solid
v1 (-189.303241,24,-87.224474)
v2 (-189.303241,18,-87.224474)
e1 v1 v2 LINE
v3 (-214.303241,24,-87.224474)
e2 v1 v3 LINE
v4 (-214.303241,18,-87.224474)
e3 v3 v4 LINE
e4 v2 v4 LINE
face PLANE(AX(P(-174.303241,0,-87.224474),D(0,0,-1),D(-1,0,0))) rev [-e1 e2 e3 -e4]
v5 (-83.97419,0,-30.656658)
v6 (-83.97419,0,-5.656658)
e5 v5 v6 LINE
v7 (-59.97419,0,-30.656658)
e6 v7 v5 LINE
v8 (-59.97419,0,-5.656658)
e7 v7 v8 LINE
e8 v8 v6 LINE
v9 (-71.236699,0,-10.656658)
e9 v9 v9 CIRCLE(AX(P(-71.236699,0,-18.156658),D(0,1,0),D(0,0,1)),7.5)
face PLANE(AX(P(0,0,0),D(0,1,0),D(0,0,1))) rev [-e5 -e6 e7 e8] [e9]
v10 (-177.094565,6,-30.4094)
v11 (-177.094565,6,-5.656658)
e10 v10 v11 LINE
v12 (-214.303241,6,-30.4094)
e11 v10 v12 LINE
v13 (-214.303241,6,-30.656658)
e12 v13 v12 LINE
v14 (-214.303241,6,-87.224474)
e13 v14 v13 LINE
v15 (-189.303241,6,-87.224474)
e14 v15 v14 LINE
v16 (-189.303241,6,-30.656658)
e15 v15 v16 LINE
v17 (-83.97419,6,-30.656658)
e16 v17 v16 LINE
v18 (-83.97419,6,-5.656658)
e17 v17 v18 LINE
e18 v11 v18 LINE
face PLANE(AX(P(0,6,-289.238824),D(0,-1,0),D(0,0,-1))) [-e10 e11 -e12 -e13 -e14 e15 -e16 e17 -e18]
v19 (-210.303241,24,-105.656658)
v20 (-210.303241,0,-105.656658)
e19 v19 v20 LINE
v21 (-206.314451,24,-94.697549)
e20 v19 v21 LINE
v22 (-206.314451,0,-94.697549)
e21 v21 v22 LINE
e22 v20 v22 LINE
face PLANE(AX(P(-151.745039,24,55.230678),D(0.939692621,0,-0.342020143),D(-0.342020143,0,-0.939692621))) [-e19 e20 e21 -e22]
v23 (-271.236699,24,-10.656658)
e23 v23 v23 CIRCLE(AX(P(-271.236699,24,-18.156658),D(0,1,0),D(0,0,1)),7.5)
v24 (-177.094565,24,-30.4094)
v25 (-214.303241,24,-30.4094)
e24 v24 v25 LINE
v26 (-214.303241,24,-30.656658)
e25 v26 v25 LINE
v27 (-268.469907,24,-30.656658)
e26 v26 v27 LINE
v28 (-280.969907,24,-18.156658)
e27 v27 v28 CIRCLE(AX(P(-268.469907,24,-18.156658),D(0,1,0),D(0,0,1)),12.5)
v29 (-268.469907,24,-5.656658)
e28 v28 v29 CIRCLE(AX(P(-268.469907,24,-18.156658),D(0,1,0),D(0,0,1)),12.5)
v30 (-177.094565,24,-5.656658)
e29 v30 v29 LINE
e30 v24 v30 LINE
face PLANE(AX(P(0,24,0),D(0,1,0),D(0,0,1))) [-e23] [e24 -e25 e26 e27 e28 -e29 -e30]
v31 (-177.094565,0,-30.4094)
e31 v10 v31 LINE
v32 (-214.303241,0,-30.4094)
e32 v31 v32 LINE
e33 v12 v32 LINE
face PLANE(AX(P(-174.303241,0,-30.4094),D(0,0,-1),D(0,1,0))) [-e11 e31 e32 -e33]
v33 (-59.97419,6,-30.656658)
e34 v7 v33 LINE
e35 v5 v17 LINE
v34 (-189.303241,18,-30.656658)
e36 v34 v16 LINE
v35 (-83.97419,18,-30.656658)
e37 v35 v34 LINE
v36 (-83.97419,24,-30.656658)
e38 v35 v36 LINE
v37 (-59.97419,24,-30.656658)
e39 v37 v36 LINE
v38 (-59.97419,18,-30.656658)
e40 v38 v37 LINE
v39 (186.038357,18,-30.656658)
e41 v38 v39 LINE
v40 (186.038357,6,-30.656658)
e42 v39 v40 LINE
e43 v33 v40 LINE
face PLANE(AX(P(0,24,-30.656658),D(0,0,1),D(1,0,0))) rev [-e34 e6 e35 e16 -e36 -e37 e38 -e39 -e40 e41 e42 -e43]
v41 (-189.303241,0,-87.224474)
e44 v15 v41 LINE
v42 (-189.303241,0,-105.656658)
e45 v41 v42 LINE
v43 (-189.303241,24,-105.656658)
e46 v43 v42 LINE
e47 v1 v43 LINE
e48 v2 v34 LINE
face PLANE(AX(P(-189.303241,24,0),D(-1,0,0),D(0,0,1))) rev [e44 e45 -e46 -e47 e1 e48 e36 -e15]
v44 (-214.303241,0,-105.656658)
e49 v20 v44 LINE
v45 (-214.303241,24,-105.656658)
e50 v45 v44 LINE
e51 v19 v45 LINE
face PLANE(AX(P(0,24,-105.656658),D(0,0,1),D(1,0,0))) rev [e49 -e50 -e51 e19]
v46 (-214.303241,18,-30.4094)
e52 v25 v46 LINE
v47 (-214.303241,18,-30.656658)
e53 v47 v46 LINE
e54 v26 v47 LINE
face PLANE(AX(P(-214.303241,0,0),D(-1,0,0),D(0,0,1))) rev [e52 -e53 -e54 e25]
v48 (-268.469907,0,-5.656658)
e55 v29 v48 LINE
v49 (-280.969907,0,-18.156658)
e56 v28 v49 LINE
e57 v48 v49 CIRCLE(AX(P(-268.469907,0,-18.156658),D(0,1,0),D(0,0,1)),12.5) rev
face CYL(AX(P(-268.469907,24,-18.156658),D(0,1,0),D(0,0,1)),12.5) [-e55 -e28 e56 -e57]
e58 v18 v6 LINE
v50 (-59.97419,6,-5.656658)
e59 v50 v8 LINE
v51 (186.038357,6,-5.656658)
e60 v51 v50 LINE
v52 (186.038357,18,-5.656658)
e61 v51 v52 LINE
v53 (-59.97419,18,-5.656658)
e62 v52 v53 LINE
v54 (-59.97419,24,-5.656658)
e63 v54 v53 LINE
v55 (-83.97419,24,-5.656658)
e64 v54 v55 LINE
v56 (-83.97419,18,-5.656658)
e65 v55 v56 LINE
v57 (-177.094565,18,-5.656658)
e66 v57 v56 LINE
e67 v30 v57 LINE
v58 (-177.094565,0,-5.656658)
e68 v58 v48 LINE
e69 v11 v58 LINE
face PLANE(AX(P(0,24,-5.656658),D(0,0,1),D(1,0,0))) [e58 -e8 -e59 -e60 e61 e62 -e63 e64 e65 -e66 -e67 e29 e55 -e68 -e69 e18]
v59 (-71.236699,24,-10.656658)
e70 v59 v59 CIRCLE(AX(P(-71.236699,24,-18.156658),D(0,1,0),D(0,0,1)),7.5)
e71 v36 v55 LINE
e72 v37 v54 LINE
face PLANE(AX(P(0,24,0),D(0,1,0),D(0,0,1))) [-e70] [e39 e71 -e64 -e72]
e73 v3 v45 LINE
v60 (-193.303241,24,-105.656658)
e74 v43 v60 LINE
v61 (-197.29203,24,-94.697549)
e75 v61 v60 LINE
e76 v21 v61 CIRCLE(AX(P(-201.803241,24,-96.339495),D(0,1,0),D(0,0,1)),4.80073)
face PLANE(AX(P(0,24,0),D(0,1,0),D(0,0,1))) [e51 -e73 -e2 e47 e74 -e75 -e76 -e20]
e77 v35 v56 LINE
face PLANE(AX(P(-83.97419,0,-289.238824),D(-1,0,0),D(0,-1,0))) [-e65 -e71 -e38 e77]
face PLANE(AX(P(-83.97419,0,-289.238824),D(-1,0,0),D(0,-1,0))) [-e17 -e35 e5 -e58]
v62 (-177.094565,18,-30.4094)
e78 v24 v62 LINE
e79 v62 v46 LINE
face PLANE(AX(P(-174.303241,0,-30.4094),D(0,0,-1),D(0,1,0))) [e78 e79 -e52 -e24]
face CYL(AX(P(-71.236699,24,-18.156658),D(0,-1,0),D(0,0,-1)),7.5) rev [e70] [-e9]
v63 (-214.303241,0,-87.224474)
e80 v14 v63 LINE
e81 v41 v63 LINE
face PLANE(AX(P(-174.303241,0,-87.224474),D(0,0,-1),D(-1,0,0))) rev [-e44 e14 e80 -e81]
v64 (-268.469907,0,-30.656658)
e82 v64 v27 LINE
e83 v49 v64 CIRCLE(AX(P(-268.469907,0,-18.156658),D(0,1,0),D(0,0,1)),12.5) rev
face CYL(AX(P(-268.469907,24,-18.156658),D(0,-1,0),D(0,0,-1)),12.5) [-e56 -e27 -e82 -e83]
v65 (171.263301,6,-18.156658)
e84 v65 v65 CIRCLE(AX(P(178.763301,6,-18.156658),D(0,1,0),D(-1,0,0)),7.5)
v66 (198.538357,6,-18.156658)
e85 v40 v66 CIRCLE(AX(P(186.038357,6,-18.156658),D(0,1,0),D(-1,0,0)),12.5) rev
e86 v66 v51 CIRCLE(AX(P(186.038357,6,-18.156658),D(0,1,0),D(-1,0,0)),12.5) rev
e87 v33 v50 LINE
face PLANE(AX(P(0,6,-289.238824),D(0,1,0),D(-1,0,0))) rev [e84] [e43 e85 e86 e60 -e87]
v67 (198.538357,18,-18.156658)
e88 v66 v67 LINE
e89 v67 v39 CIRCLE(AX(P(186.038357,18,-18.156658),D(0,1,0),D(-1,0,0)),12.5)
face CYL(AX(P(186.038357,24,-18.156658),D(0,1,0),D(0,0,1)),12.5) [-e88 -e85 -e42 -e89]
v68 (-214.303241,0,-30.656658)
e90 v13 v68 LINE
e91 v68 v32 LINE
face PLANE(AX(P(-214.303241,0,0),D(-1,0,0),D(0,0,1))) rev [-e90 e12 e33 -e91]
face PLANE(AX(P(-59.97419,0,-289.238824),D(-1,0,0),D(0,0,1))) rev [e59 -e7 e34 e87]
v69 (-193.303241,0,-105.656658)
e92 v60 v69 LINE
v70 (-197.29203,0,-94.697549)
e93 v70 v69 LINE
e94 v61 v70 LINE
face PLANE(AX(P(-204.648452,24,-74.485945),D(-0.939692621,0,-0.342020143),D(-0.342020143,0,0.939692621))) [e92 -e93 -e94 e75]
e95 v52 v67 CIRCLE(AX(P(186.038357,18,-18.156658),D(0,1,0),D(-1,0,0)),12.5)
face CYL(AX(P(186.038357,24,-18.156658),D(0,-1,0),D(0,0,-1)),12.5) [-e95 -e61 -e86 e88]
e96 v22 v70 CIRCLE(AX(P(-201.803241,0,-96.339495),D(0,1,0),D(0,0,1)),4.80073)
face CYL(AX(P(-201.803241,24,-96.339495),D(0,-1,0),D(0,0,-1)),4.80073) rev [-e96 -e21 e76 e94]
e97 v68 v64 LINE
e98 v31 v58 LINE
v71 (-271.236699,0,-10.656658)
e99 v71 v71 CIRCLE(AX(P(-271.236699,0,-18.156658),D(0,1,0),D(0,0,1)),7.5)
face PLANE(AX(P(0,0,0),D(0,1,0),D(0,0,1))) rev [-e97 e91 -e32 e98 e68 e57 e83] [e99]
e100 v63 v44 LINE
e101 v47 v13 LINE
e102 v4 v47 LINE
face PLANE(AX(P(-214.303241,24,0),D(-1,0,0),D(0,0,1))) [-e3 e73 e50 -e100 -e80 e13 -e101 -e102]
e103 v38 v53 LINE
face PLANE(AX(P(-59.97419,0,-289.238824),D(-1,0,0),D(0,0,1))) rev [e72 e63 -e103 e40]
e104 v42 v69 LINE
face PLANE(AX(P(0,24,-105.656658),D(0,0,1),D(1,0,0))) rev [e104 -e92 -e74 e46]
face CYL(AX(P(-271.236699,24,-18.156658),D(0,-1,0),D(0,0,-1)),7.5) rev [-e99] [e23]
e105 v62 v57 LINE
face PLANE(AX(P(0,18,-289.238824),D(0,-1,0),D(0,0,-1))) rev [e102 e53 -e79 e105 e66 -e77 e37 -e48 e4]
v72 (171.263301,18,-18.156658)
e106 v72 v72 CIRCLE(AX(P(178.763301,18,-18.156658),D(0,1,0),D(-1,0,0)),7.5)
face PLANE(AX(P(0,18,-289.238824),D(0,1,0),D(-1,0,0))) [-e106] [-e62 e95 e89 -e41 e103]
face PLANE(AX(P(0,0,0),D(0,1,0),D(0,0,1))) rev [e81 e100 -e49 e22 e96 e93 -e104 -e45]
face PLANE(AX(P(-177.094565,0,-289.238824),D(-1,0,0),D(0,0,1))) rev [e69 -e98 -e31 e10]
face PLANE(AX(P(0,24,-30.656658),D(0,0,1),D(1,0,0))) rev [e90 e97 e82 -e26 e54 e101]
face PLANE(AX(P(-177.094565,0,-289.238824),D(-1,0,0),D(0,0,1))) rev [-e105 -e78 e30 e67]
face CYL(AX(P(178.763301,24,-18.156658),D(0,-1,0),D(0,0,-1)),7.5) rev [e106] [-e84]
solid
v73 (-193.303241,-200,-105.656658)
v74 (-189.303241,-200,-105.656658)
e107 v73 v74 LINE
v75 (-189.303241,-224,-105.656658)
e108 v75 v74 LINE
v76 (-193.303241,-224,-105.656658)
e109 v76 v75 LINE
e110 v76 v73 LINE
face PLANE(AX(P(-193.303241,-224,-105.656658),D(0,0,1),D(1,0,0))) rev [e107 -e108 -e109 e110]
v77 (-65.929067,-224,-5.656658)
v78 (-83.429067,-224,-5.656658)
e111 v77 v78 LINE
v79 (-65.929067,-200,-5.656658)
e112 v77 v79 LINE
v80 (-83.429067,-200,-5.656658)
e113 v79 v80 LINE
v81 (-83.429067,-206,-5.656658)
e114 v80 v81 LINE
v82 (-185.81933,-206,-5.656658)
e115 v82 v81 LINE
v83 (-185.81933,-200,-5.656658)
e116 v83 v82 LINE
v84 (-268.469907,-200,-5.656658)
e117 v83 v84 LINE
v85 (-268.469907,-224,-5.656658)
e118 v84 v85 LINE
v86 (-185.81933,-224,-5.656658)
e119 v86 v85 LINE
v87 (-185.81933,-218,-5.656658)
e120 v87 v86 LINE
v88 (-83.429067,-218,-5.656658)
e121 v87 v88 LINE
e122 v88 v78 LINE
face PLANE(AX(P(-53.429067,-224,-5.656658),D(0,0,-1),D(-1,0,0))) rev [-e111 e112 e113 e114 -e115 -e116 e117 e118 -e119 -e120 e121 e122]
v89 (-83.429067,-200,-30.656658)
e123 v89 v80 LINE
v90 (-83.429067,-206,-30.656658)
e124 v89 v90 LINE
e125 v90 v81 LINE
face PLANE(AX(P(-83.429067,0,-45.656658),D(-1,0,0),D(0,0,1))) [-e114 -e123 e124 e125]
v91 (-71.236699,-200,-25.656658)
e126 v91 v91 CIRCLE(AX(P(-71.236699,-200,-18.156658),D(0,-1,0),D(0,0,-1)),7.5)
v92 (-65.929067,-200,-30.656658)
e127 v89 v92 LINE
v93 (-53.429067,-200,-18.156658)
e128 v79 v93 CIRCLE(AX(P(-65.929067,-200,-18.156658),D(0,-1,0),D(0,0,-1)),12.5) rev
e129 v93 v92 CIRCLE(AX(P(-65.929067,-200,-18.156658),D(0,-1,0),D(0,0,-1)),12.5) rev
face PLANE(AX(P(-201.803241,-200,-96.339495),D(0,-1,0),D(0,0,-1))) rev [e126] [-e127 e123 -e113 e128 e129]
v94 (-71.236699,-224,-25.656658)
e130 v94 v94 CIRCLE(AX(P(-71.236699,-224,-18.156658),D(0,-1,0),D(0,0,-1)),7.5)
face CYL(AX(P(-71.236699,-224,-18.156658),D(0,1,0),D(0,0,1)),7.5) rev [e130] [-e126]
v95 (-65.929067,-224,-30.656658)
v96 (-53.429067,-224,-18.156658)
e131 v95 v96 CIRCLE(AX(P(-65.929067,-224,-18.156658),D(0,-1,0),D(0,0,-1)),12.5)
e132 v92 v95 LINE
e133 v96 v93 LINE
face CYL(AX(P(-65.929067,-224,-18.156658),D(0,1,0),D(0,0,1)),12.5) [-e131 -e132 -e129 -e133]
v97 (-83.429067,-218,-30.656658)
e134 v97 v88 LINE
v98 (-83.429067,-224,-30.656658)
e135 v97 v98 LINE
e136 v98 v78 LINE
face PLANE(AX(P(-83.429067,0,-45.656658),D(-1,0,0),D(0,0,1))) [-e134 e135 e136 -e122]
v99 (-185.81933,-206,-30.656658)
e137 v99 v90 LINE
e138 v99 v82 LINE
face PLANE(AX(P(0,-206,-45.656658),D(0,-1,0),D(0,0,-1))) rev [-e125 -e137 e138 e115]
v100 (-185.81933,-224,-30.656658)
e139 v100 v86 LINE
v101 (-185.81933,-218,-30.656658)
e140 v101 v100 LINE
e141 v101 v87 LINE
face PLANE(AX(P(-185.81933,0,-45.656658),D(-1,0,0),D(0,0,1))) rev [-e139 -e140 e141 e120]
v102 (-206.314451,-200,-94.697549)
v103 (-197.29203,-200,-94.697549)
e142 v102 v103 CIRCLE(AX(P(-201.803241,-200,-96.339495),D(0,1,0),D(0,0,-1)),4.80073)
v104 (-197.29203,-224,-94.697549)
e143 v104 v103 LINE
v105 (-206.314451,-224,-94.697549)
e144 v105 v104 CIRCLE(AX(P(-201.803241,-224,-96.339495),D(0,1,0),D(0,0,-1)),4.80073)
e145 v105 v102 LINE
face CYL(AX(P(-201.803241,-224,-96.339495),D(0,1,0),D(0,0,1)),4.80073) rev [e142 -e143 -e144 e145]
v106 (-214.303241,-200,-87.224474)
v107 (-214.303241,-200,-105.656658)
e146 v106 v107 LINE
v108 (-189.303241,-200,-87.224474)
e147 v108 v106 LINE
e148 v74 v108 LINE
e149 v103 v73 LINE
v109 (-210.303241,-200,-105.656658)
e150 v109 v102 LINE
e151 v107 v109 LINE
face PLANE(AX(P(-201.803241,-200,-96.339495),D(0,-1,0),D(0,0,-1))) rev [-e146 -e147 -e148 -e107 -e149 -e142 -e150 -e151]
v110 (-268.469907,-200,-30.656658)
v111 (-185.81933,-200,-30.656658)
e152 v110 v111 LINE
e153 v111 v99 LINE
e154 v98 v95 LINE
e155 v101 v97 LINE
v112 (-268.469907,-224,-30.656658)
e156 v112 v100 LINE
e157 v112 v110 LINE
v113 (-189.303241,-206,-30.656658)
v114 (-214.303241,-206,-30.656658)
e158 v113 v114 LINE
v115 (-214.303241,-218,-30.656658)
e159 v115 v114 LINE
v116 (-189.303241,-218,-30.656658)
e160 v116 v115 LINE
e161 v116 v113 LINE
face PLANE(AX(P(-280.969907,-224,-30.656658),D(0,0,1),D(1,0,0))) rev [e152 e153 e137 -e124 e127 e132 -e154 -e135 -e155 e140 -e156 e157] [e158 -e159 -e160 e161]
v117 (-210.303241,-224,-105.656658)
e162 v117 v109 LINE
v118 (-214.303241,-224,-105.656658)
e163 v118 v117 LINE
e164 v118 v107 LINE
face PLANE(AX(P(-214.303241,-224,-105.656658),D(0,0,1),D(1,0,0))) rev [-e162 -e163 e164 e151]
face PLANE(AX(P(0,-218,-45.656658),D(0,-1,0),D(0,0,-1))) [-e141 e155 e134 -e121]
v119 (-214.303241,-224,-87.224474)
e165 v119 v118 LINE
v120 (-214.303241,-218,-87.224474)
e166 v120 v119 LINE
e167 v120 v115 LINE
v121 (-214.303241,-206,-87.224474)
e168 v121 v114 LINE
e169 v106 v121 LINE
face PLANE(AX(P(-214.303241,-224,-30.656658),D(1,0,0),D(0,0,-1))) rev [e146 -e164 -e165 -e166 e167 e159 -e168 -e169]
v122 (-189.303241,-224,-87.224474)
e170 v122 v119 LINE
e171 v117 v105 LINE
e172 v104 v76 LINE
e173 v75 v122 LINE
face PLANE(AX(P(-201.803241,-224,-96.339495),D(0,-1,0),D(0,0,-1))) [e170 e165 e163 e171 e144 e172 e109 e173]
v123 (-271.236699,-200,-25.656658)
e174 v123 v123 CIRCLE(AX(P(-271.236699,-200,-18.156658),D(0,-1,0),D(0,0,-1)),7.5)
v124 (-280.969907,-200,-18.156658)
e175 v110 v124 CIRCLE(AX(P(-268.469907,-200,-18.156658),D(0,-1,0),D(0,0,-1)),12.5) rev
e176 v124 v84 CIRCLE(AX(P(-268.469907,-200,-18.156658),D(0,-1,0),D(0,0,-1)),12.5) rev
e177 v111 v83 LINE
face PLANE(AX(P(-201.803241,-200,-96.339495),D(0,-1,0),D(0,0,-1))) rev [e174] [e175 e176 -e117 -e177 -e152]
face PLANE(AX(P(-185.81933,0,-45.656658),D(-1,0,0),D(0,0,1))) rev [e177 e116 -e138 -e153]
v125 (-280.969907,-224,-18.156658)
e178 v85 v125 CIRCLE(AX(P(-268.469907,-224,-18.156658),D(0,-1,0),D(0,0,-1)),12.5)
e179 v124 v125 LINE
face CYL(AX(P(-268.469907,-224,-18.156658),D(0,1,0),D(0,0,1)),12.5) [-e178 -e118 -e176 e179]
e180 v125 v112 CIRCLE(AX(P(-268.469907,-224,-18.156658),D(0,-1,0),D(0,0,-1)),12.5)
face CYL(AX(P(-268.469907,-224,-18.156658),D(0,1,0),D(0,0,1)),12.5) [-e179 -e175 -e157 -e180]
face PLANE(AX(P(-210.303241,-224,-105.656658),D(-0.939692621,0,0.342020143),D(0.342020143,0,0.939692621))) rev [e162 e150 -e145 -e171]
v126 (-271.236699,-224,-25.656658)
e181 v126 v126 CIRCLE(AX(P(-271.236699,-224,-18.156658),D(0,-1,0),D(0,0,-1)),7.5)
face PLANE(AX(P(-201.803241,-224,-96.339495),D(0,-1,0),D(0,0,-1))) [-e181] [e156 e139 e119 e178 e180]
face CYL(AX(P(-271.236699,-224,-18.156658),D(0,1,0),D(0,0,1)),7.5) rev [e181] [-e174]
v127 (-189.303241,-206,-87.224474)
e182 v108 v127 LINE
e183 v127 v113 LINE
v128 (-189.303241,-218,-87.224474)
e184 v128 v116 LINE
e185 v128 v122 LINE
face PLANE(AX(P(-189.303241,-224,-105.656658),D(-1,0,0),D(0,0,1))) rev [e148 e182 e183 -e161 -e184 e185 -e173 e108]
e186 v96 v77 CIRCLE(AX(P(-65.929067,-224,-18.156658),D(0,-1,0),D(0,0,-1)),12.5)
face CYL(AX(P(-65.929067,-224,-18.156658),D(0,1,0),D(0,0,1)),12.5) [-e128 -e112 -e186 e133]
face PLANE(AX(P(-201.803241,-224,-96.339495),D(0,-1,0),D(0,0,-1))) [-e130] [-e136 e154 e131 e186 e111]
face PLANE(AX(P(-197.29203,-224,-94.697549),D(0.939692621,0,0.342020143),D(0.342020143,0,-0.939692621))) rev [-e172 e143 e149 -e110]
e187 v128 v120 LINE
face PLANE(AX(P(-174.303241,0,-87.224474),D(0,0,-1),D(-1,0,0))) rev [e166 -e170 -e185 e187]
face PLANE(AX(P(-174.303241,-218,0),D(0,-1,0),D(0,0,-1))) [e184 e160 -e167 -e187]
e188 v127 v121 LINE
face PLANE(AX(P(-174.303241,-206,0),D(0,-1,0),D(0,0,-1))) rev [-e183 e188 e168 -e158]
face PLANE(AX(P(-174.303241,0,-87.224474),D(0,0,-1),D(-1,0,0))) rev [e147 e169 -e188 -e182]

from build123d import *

# Parameters (mm, degrees)
SKETCH1_R                = 7.5
BOSS_EXTRUDE1_DEPTH      = 24
SKETCH7_R                = 7.5
BOSS_EXTRUDE2_DEPTH      = 24
SKETCH9_W                = 267.304996702
SKETCH9_H                = 6
SKETCH9_W_2              = 93.120375714
CUT_EXTRUDE2_DEPTH       = 25
SKETCH10_W               = 102.39026263
SKETCH10_H               = 6
CUT_EXTRUDE6_DEPTH       = 40
CUT_EXTRUDE7_START       = -37.208675348
CUT_EXTRUDE7_OUTLINE_W   = 56.567816269
CUT_EXTRUDE7_OUTLINE_H   = 6
CUT_EXTRUDE7_OUTLINE_W_2 = 56.815074254
CUT_EXTRUDE7_DEPTH       = 37.208675348
FILLET1_R                = 12.5
FILLET2_R                = 12.5


# Read off the part's stored shape, not the designer's step: Cut-Extrude7
with BuildPart() as part:
    # Sketch1 → Boss-Extrude1 (new body)
    with BuildSketch(Plane(origin=(0, 0, 0), x_dir=(1, 0, 0), z_dir=(0, 1, 0))):
        with BuildLine():
            Line((-206.314451257, 94.69754914), (-210.303240713, 105.656658099))
            Line((-210.303240713, 105.656658099), (-214.303240713, 105.656658099))
            Line((-214.303240713, 105.656658099), (-214.303240713, 30.656658099))
            Line((-214.303240713, 30.656658099), (-280.969907379, 30.656658099))
            Line((-280.969907379, 30.656658099), (-280.969907379, 5.656658099))
            Line((-280.969907379, 5.656658099), (198.538356926, 5.656658099))
            Line((198.538356926, 5.656658099), (198.538356926, 30.656658099))
            Line((198.538356926, 30.656658099), (-189.303240713, 30.656658099))
            Line((-189.303240713, 30.656658099), (-189.303240713, 105.656658099))
            Line((-189.303240713, 105.656658099), (-193.303240713, 105.656658099))
            Line((-193.303240713, 105.656658099), (-197.292030168, 94.69754914))
            ThreePointArc((-197.292030168, 94.69754914), (-201.803240713, 91.53876551), (-206.314451257, 94.69754914))
        make_face()
        with Locations(Location((-271.236698838, 18.156658099, 0), (0, 0, 270))):
            Circle(SKETCH1_R, mode=Mode.SUBTRACT)
        with BuildLine():
            ThreePointArc((-63.736698838, 18.156658099), (-71.236698838, 10.656658099), (-78.736698838, 18.156658099))
            ThreePointArc((-78.736698838, 18.156658099), (-71.236698838, 25.656658099), (-63.736698838, 18.156658099))
        make_face(mode=Mode.SUBTRACT)
        with Locations(Location((178.763301162, 18.156658099, 0), (0, 0, 270))):
            Circle(SKETCH1_R, mode=Mode.SUBTRACT)
    extrude(amount=BOSS_EXTRUDE1_DEPTH)

    # Sketch9 → Cut-Extrude2 (cut)
    with BuildSketch(Plane.XY.offset(-5.656658099)):
        with Locations((73.678308701, 21)):
            Rectangle(SKETCH9_W, SKETCH9_H)
        with Locations((73.678308701, 3)):
            Rectangle(SKETCH9_W, SKETCH9_H)
        with Locations((-130.534377507, 21)):
            Rectangle(SKETCH9_W_2, SKETCH9_H)
        with Locations((-130.534377507, 3)):
            Rectangle(SKETCH9_W_2, SKETCH9_H)
    extrude(amount=-CUT_EXTRUDE2_DEPTH, mode=Mode.SUBTRACT)


with BuildPart() as body_2:
    # Sketch7 → Boss-Extrude2 (new body)
    with BuildSketch(Plane(origin=(0, -200, 0), x_dir=(-1, 0, 0), z_dir=(0, -1, 0))):
        with BuildLine():
            Line((53.429067072, 30.656658099), (53.429067072, 5.656658099))
            Line((53.429067072, 5.656658099), (280.969907379, 5.656658099))
            Line((280.969907379, 5.656658099), (280.969907379, 30.656658099))
            Line((280.969907379, 30.656658099), (214.303240713, 30.656658099))
            Line((214.303240713, 30.656658099), (214.303240713, 105.656658099))
            Line((214.303240713, 105.656658099), (210.303240713, 105.656658099))
            Line((210.303240713, 105.656658099), (206.314451257, 94.69754914))
            ThreePointArc((206.314451257, 94.69754914), (201.803240713, 91.53876551), (197.292030168, 94.69754914))
            Line((197.292030168, 94.69754914), (193.303240713, 105.656658099))
            Line((193.303240713, 105.656658099), (189.303240713, 105.656658099))
            Line((189.303240713, 105.656658099), (189.303240713, 30.656658099))
            Line((189.303240713, 30.656658099), (53.429067072, 30.656658099))
        make_face()
        with Locations(Location((271.236698838, 18.156658099, 0), (0, 0, 90))):
            Circle(SKETCH7_R, mode=Mode.SUBTRACT)
        with Locations(Location((71.236698838, 18.156658099, 0), (0, 0, 90))):
            Circle(SKETCH7_R, mode=Mode.SUBTRACT)
    extrude(amount=BOSS_EXTRUDE2_DEPTH)

    # Sketch10 → Cut-Extrude6 (cut)
    with BuildSketch(Plane.XY.offset(-5.656658099)):
        with Locations((-134.624198387, -203)):
            Rectangle(SKETCH10_W, SKETCH10_H)
        with Locations((-134.624198387, -221)):
            Rectangle(SKETCH10_W, SKETCH10_H)
    extrude(amount=-CUT_EXTRUDE6_DEPTH, mode=Mode.SUBTRACT)


with BuildPart() as cut_extrude7_tool:
    # Cut-Extrude7 outline → Cut-Extrude7 (new body)
    with BuildSketch(Plane.ZY.offset(214.303240713).offset(CUT_EXTRUDE7_START)):
        with Locations((-58.940566234, -221)):
            Rectangle(CUT_EXTRUDE7_OUTLINE_W, CUT_EXTRUDE7_OUTLINE_H)
        with Locations((-58.940566234, -203)):
            Rectangle(CUT_EXTRUDE7_OUTLINE_W, CUT_EXTRUDE7_OUTLINE_H)
        with Locations((-58.816937241, 21)):
            Rectangle(CUT_EXTRUDE7_OUTLINE_W_2, CUT_EXTRUDE7_OUTLINE_H)
        with Locations((-58.816937241, 3)):
            Rectangle(CUT_EXTRUDE7_OUTLINE_W_2, CUT_EXTRUDE7_OUTLINE_H)
    extrude(amount=CUT_EXTRUDE7_DEPTH)


with BuildPart() as part_1:
    add(part.part)

    # Cut-Extrude7: cut by cut_extrude7_tool
    add(cut_extrude7_tool.part, mode=Mode.SUBTRACT)

    # Fillet1
    fillet1_edges = [part_1.edges().sort_by_distance(p)[0] for p in [
        (-280.969907379, 12, -5.656658099),
        (-280.969907379, 12, -30.656658099),
        (198.538356926, 12, -5.656658099),
        (198.538356926, 12, -30.656658099),
    ]]
    fillet(fillet1_edges, radius=FILLET1_R - 0.0001)  # a hair under: the kernel refuses the full size


with BuildPart() as body_2_1:
    add(body_2.part)

    # Cut-Extrude7: cut by cut_extrude7_tool
    add(cut_extrude7_tool.part, mode=Mode.SUBTRACT)

    # Fillet2
    fillet2_edges = [body_2_1.edges().sort_by_distance(p)[0] for p in [
        (-53.429067072, -212, -5.656658099),
        (-53.429067072, -212, -30.656658099),
        (-280.969907379, -212, -5.656658099),
        (-280.969907379, -212, -30.656658099),
    ]]
    fillet(fillet2_edges, radius=FILLET2_R - 0.0001)  # a hair under: the kernel refuses the full size


solid = Compound([part_1.part, body_2_1.part])
